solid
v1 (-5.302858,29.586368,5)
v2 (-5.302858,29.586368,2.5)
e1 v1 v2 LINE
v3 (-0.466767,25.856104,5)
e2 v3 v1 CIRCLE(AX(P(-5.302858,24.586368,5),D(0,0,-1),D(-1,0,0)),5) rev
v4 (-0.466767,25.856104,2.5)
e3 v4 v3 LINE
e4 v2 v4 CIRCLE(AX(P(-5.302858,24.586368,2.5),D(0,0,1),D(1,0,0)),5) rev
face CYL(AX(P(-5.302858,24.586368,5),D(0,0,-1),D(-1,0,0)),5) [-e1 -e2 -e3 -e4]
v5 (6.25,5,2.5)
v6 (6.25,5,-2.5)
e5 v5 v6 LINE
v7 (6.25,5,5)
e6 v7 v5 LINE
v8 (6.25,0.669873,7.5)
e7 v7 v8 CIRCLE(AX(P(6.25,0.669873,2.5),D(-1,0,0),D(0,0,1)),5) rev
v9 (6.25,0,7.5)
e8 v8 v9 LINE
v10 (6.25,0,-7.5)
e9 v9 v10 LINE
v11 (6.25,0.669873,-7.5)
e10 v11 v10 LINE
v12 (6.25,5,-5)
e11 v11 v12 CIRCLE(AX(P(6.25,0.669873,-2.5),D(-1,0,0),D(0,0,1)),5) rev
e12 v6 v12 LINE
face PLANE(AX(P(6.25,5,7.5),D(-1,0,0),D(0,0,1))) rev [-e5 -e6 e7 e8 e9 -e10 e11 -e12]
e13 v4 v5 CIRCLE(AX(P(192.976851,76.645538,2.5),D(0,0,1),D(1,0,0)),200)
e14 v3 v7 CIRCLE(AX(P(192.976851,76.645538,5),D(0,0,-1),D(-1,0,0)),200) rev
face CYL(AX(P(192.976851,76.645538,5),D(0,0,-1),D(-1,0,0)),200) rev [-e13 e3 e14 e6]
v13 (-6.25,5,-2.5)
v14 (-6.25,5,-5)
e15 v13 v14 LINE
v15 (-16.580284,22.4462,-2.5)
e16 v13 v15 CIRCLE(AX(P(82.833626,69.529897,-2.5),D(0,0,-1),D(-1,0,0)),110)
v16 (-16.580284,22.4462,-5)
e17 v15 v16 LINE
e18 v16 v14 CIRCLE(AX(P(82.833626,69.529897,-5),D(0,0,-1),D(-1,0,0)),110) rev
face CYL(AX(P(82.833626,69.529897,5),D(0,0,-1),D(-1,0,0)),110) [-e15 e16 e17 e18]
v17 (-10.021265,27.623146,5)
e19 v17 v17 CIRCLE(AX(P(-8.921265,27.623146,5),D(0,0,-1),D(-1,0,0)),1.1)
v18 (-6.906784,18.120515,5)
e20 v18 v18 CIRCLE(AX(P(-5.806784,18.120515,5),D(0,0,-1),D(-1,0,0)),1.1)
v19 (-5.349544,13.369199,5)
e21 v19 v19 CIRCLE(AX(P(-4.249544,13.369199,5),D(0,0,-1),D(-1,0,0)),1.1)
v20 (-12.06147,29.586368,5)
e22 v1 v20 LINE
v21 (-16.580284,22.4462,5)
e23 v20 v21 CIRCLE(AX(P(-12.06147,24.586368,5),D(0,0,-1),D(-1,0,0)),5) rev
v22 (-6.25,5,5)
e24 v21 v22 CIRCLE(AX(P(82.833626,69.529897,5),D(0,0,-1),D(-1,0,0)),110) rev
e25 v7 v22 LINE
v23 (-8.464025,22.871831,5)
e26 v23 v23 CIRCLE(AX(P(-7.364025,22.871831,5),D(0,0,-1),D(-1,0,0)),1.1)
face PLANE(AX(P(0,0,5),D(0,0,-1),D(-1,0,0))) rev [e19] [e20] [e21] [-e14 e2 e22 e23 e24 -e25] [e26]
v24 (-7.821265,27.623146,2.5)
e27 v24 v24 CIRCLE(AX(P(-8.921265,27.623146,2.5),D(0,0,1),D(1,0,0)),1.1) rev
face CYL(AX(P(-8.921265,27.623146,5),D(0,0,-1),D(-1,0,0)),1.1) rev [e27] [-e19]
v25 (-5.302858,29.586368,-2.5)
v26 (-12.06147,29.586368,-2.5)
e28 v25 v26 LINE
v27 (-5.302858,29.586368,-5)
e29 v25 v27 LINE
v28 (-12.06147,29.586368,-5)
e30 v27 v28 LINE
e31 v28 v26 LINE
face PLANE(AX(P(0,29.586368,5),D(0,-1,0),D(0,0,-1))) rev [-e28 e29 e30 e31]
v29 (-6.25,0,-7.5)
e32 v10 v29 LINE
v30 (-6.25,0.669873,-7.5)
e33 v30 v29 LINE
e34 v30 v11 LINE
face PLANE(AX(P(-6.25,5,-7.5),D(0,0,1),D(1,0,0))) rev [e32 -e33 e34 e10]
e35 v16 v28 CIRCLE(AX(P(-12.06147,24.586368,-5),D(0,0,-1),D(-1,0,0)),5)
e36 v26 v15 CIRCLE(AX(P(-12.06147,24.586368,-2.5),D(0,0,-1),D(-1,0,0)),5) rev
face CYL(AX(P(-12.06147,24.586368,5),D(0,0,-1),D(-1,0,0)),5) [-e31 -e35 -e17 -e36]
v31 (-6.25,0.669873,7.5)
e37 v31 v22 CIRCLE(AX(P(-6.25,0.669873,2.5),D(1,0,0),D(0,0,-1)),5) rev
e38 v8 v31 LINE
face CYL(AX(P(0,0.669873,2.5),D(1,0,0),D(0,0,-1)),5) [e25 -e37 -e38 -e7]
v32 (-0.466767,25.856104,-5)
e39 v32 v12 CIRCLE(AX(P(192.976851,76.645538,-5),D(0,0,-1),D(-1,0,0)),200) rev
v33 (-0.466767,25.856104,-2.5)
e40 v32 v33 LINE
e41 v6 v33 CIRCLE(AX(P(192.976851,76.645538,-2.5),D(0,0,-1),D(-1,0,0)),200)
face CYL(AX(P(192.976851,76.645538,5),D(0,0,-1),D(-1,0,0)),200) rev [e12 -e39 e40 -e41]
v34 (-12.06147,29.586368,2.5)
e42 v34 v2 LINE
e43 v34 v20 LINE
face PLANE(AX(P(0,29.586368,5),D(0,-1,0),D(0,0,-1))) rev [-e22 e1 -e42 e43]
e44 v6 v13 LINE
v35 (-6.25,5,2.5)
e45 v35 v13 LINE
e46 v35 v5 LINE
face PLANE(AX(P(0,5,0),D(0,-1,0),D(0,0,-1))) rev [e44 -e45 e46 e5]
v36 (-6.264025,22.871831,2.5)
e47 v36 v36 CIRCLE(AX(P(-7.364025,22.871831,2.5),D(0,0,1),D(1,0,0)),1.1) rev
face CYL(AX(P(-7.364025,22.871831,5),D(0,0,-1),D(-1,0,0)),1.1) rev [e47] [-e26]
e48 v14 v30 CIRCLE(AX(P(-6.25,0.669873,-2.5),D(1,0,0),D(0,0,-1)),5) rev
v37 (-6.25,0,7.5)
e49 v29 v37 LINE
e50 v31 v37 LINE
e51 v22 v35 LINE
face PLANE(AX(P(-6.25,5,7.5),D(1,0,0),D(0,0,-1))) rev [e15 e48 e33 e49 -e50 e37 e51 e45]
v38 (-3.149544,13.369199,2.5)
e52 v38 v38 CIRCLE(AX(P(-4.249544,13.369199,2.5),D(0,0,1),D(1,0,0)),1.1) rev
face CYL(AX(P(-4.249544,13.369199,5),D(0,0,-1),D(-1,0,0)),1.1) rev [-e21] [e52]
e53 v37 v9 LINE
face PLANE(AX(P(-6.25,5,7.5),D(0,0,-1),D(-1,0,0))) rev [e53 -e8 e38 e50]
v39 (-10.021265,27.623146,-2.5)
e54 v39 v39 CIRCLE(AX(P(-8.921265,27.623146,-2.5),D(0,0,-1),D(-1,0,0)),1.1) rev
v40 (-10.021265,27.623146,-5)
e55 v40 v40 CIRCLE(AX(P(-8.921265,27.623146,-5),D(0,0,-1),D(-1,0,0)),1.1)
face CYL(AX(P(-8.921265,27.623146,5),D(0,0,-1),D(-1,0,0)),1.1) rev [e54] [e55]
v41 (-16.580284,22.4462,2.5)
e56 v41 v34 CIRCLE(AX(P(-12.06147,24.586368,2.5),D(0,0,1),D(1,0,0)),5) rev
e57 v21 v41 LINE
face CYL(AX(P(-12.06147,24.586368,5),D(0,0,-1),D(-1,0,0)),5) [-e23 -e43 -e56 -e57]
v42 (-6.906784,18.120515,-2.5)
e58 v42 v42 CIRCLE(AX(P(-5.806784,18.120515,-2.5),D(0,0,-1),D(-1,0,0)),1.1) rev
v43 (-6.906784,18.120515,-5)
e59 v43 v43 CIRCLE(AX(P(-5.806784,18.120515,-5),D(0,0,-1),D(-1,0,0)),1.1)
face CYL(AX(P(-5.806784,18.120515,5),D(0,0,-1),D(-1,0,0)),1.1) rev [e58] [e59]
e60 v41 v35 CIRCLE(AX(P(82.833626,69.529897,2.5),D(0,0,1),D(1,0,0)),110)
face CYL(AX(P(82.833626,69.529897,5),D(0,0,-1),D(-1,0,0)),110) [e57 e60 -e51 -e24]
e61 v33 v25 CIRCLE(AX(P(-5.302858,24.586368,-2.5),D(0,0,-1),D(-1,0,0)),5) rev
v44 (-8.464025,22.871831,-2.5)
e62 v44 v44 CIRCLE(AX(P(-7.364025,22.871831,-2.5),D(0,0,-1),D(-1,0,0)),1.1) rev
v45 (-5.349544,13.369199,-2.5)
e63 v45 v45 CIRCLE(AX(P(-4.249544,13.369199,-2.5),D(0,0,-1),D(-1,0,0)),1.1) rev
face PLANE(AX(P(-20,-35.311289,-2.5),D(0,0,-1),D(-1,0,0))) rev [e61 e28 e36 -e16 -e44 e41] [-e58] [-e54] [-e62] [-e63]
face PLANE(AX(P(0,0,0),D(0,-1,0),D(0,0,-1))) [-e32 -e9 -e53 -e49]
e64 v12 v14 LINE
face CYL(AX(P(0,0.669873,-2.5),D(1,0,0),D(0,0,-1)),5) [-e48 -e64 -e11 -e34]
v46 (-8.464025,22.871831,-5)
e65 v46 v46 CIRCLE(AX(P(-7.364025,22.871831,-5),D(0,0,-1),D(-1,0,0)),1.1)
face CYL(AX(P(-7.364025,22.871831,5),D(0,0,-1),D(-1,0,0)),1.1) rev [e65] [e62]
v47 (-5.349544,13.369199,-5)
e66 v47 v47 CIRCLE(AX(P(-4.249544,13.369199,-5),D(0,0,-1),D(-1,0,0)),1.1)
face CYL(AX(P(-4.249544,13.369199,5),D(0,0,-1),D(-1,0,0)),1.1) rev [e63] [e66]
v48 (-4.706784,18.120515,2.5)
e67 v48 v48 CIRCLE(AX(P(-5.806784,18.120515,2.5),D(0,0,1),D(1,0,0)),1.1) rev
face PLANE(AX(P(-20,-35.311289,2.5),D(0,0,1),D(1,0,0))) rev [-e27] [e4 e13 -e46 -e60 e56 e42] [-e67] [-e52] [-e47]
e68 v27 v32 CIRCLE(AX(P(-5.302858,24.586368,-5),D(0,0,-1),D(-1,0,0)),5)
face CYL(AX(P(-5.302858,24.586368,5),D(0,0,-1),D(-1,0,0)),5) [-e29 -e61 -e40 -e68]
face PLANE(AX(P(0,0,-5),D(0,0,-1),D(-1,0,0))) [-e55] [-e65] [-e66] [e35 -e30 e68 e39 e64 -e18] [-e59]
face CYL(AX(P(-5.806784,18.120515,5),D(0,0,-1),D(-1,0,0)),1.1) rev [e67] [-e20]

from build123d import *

# Parameters (mm, degrees)
SKETCH1_W           = 12.5
SKETCH1_H           = 15
BOSS_EXTRUDE1_DEPTH = 5
SKETCH12_R          = 1.1
BOSS_EXTRUDE3_DEPTH = 10
CUT_EXTRUDE2_REACH  = 38.305
SKETCH13_W          = 40
SKETCH13_H          = 5
FILLET2_R           = 5


with BuildPart() as part:
    # Sketch1 → Boss-Extrude1 (new body)
    with BuildSketch(Plane(origin=(0, 0, 0), x_dir=(1, 0, 0), z_dir=(0, 1, 0))):
        Rectangle(SKETCH1_W, SKETCH1_H)
    extrude(amount=BOSS_EXTRUDE1_DEPTH)

    # Sketch12 → Boss-Extrude3 (add)
    with BuildSketch(Plane(origin=(0, 0, -5), x_dir=(-1, 0, 0), z_dir=(0, 0, -1))):
        with BuildLine():
            Line((19.657908058, 29.586368397), (1.407908058, 29.586368397))
            ThreePointArc((1.407908058, 29.586368397), (-2.024927187, 17.169805211), (-6.25, 5))
            Line((-6.25, 5), (6.25, 5))
            ThreePointArc((6.25, 5), (13.739573521, 16.86475517), (19.657908058, 29.586368397))
        make_face()
        with Locations((4.249543893, 13.369198977)):
            Circle(SKETCH12_R, mode=Mode.SUBTRACT)
        with Locations((5.806784348, 18.120514812)):
            Circle(SKETCH12_R, mode=Mode.SUBTRACT)
        with Locations((7.364024803, 22.871830647)):
            Circle(SKETCH12_R, mode=Mode.SUBTRACT)
        with Locations((8.921265258, 27.623146482)):
            Circle(SKETCH12_R, mode=Mode.SUBTRACT)
    extrude(amount=-BOSS_EXTRUDE3_DEPTH)

    # Cut-Extrude2: up to this face of the body (flat: up to its plane)
    cut_extrude2_end = Plane(part.part.faces().sort_by_distance((0, 5, 6.25))[0])
    # Sketch13 → Cut-Extrude2 (cut, up to the picked face)
    with BuildSketch(Plane(origin=(0, 29.586368397, 0), x_dir=(1, 0, 0), z_dir=(0, 1, 0)), mode=Mode.PRIVATE) as cut_extrude2_sk1:
        Rectangle(SKETCH13_W, SKETCH13_H)
    cut_extrude2_tool1 = split(extrude(cut_extrude2_sk1.sketch, amount=-CUT_EXTRUDE2_REACH, mode=Mode.PRIVATE), bisect_by=cut_extrude2_end, keep=Keep.BOTH, mode=Mode.PRIVATE)
    add(cut_extrude2_tool1.solids().sort_by(Axis((0, 29.586368, 0), (0, -1, 0)))[0], mode=Mode.SUBTRACT)

    # Fillet2
    # the kernel refuses this fillet: 5 mm, written as the material it takes off along each edge
    with BuildSketch(Plane(origin=(-19.657908058, 29.586368397, -16.938005308), x_dir=(0.3958255754909857, -0.9183257122542251, 0), z_dir=(0, 0, 1)), Plane(origin=(-19.657908058, 29.586368397, -24.438005308), x_dir=(0.3958255754909857, -0.9183257122542251, 0), z_dir=(0, 0, 1))) as fillet2_piece_1:
        with BuildLine():
            CenterArc((7.598492984, 4.996876412), FILLET2_R, 156.682526959, 115.342832392)
            Line((3.006864423, 6.97600429), (2.915031851, 7.015586847))
            Line((2.915031851, 7.015586847), (-0.091832571, 0.039582558))
            Line((-0.091832571, 0.039582558), (-0.003534183, -0.099937528))
            ThreePointArc((-0.003534183, -0.099937528), (3.887601062, -0.168718929), (7.778736306, -0.099937528))
            Line((7.778736306, -0.099937528), (7.775202123, 0))
        make_face()
    extrude(amount=41.376010616, mode=Mode.SUBTRACT)
    with BuildSketch(Plane(origin=(-1.407908058, 29.586368397, -7.237373954), x_dir=(0.2446328232402741, -0.96961579081278, 0), z_dir=(0, 0, 1)), Plane(origin=(-1.407908058, 29.586368397, -14.737373954), x_dir=(0.2446328232402737, -0.9696157908127802, 0), z_dir=(0, 0, 1))) as fillet2_piece_2:
        with BuildLine():
            CenterArc((3.895246442, -4.999768735), FILLET2_R, 90.551073141, 75.28879109)
            Line((-0.952832513, -3.776604619), (-1.049794092, -3.752141336))
            Line((-1.049794092, -3.752141336), (-0.096961579, 0.024463282))
            Line((-0.096961579, 0.024463282), (0.000961789, 0.099995375))
            ThreePointArc((0.000961789, 0.099995375), (1.92357849, 0.090749401), (3.84619519, 0.099995375))
            Line((3.84619519, 0.099995375), (3.847156979, 0))
        make_face()
    extrude(amount=21.974747908, mode=Mode.SUBTRACT)
    with BuildSketch(Plane(origin=(17.075317547, 5, -7.5), x_dir=(0, -1, 0), z_dir=(-1, 0, 0)), Plane(origin=(-17.075317547, 5, 7.5), x_dir=(0, -1, 0), z_dir=(1, 0, 0))) as fillet2_piece_3:
        with BuildLine():
            CenterArc((4.330127019, 5), FILLET2_R, 210, 60)
            Line((0, 2.5), (-0.08660254, 2.45))
            ThreePointArc((-0.08660254, 2.45), (-0.1, 1.25), (-0.1, 0))
            Line((-0.1, 0), (0, -0.1))
            Line((0, -0.1), (4.330127019, -0.1))
            Line((4.330127019, -0.1), (4.330127019, 0))
        make_face()
    extrude(amount=34.150635095, mode=Mode.SUBTRACT)


solid = part.part
